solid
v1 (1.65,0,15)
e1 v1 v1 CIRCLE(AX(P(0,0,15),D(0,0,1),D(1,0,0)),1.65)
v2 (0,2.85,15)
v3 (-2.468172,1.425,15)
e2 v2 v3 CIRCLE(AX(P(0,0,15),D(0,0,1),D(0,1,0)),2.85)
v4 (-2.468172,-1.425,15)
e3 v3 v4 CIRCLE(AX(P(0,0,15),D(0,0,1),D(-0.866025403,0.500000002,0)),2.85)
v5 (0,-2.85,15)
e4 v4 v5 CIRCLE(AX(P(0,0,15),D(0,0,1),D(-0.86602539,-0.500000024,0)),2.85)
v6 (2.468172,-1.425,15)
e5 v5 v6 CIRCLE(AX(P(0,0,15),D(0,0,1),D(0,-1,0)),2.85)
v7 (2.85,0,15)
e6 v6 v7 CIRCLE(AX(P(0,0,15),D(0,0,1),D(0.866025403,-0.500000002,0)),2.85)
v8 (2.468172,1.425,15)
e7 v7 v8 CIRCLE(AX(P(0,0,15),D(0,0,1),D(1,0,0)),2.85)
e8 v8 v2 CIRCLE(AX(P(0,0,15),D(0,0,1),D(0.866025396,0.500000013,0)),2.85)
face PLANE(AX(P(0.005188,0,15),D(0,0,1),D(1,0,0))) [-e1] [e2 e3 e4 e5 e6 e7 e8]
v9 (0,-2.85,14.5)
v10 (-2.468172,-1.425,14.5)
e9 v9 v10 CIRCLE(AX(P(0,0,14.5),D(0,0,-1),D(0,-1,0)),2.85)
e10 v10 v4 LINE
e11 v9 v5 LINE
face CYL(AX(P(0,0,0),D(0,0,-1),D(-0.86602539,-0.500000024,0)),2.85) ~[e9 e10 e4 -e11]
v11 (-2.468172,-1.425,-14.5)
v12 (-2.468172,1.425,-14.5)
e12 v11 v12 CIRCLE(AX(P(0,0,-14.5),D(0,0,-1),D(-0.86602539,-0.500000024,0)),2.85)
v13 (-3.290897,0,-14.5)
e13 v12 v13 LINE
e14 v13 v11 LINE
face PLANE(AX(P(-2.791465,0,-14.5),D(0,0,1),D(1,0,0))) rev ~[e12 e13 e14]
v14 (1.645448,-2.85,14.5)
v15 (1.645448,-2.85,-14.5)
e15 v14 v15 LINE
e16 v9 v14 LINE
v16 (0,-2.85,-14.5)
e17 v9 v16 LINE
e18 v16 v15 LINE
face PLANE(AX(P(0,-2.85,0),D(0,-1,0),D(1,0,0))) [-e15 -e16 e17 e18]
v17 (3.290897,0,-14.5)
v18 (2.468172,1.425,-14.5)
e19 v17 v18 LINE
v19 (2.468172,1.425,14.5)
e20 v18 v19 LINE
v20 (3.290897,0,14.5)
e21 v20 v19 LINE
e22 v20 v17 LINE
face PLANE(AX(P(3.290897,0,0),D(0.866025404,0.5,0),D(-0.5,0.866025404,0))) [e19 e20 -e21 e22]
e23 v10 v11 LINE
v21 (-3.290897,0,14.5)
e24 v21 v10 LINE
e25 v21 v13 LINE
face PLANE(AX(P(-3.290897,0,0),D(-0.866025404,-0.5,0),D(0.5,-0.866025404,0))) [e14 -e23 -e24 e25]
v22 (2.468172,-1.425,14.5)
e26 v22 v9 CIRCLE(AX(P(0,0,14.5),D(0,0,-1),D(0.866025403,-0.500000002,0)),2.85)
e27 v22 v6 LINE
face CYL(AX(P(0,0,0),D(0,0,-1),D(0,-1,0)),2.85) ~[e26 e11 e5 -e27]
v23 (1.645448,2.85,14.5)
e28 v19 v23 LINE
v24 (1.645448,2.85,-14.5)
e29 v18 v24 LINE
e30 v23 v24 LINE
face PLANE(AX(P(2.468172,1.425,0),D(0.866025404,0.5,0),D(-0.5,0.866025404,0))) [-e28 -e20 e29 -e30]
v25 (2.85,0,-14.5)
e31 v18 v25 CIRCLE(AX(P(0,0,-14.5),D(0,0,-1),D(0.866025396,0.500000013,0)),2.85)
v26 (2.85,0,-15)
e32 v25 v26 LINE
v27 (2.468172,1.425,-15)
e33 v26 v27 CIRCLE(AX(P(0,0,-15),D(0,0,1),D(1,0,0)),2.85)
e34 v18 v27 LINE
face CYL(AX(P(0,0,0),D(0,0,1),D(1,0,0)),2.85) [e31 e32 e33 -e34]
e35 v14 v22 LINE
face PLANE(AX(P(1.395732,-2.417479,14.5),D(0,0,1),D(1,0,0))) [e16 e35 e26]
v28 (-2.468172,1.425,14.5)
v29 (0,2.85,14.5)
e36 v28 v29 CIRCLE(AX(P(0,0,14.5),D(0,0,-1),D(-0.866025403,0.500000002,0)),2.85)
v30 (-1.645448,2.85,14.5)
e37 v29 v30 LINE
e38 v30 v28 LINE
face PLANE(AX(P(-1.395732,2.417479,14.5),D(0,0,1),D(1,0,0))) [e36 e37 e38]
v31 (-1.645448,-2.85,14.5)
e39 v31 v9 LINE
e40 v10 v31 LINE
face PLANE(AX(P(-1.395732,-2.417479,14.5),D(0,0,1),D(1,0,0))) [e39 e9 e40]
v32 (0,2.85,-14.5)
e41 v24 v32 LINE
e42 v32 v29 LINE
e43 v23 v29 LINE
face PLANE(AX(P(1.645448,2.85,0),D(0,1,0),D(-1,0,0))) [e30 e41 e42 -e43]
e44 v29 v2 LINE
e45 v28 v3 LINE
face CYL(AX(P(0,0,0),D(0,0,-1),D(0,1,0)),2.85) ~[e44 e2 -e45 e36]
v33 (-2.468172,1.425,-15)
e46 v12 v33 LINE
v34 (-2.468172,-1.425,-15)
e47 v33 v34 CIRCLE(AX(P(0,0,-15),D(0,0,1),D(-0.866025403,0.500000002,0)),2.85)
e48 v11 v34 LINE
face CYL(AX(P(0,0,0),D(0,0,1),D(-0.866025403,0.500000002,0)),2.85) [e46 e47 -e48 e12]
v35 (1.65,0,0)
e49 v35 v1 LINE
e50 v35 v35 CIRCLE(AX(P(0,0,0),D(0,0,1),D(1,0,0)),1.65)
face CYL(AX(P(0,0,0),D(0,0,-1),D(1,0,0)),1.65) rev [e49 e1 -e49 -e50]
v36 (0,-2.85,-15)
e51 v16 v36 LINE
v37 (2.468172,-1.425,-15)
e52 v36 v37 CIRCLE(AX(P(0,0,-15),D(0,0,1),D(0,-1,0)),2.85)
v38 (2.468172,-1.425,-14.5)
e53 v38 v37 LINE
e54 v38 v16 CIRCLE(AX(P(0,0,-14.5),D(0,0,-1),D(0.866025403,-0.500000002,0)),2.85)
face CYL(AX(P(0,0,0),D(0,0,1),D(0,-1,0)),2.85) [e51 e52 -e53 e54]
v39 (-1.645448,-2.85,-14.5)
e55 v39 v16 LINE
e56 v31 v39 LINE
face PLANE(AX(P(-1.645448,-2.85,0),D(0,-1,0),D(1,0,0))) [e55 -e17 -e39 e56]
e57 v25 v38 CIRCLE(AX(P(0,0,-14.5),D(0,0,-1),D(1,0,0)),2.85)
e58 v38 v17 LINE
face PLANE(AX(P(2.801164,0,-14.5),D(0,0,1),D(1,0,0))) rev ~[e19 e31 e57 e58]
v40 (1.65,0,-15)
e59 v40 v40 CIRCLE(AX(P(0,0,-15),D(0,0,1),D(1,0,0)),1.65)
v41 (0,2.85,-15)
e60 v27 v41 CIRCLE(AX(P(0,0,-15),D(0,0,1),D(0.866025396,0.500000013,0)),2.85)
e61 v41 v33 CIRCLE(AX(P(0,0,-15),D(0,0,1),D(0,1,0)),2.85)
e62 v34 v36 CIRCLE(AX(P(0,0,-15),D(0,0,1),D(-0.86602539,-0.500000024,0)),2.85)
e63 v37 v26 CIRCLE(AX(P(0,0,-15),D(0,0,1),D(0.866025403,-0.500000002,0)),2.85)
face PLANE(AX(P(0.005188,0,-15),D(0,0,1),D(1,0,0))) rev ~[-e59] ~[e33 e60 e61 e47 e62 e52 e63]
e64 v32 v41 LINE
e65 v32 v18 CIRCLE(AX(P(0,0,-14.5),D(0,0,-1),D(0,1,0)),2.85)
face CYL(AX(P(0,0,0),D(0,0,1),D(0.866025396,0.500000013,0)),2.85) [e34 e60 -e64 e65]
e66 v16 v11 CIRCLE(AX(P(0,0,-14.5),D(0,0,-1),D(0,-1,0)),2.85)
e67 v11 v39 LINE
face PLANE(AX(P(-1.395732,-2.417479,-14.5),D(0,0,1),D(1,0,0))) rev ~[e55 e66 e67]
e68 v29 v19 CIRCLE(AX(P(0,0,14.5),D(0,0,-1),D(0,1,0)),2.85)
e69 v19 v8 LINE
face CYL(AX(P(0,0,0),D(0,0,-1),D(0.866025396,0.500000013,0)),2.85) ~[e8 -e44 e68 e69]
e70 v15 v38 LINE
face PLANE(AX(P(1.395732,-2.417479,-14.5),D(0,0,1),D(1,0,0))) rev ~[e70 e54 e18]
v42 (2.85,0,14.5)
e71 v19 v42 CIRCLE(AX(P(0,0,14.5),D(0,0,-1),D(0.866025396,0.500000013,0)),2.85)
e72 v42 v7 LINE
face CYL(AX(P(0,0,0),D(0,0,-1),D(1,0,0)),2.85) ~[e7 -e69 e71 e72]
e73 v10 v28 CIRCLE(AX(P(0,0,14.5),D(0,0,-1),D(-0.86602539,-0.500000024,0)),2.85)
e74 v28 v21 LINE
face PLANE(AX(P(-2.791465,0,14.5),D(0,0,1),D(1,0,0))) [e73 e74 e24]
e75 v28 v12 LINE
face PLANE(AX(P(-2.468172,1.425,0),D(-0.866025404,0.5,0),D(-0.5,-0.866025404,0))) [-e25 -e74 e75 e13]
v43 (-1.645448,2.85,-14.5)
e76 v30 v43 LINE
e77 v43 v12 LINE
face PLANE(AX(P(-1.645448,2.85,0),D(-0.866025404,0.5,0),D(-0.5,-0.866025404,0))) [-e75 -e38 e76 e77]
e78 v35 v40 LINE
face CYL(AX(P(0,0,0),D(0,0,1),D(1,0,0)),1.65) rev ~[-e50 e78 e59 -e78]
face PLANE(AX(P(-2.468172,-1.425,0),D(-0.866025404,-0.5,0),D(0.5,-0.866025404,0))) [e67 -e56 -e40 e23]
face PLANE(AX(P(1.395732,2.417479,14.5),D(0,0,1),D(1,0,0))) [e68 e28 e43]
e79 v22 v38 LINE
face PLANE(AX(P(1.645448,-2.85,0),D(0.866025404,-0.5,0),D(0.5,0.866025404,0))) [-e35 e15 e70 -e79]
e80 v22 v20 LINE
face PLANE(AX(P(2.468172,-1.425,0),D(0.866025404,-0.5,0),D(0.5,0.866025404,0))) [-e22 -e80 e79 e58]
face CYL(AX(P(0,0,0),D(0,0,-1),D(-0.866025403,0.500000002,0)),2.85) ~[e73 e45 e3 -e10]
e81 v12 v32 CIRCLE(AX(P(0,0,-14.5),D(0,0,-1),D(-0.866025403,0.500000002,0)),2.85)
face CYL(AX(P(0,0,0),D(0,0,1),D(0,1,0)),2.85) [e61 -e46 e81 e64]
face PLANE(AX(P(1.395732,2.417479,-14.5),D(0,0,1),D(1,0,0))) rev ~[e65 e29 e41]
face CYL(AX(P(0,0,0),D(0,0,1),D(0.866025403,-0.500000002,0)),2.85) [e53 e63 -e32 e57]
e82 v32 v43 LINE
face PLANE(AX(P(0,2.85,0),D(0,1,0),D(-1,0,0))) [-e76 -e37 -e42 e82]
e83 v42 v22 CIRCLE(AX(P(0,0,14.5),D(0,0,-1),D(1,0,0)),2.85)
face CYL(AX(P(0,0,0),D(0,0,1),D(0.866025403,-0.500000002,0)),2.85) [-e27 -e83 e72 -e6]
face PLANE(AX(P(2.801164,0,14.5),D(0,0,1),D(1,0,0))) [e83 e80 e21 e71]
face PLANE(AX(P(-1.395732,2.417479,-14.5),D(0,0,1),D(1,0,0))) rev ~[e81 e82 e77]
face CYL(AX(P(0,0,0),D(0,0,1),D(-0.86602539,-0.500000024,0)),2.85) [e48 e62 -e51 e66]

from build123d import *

# Parameters (mm, degrees)
F2_DEPTH = 14.5
F0_R     = 1.65
F3_DEPTH = 15


# Not quite as in the source:
# - the program builds the solid bodies; features that only make, move or delete a surface that nothing else refers to are left out


with BuildPart() as f2:
    # F0 (on Top) → F2 (new body, symmetric)
    with BuildSketch(Plane.XY):
        with BuildLine():
            ThreePointArc((-2.4681723606, -1.4250000696), (-2.85, -3.73e-08), (-2.4681723979, 1.425000005))
            Line((-2.4681723979, 1.425000005), (-3.2908965344, 0))
            Line((-3.2908965344, 0), (-2.4681723606, -1.4250000696))
        make_face()
    extrude(amount=F2_DEPTH, both=True)



with BuildPart() as f2b:
    # F0 (on Top) → F2, piece 2 (new body, symmetric)
    with BuildSketch(Plane.XY):
        with BuildLine():
            ThreePointArc((-2.4681723979, 1.425000005), (-1.4249999975, 2.4681724022), (0, 2.85))
            Line((0, 2.85), (-1.6454482672, 2.85))
            Line((-1.6454482672, 2.85), (-2.4681723979, 1.425000005))
        make_face()
    extrude(amount=F2_DEPTH, both=True)


with BuildPart() as f2c:
    # F0 (on Top) → F2, piece 3 (new body, symmetric)
    with BuildSketch(Plane.XY):
        with BuildLine():
            ThreePointArc((0, 2.85), (1.4249999814, 2.4681724115), (2.4681723793, 1.4250000373))
            Line((2.4681723793, 1.4250000373), (1.6454482672, 2.85))
            Line((1.6454482672, 2.85), (0, 2.85))
        make_face()
    extrude(amount=F2_DEPTH, both=True)


with BuildPart() as f2d:
    # F0 (on Top) → F2, piece 4 (new body, symmetric)
    with BuildSketch(Plane.XY):
        with BuildLine():
            ThreePointArc((2.4681723793, 1.4250000373), (2.7528885994, 0.7376342993), (2.85, 0))
            ThreePointArc((2.85, 0), (2.7528886042, -0.7376342813), (2.4681723979, -1.425000005))
            Line((2.4681723979, -1.425000005), (3.2908965344, 0))
            Line((3.2908965344, 0), (2.4681723793, 1.4250000373))
        make_face()
    extrude(amount=F2_DEPTH, both=True)


with BuildPart() as f2e:
    # F0 (on Top) → F2, piece 5 (new body, symmetric)
    with BuildSketch(Plane.XY):
        with BuildLine():
            Line((1.6454482672, -2.85), (2.4681723979, -1.425000005))
            ThreePointArc((2.4681723979, -1.425000005), (1.4249999975, -2.4681724022), (0, -2.85))
            Line((0, -2.85), (1.6454482672, -2.85))
        make_face()
    extrude(amount=F2_DEPTH, both=True)


with BuildPart() as f2f:
    # F0 (on Top) → F2, piece 6 (new body, symmetric)
    with BuildSketch(Plane.XY):
        with BuildLine():
            Line((-1.6454482672, -2.85), (0, -2.85))
            ThreePointArc((0, -2.85), (-1.4249999652, -2.4681724209), (-2.4681723606, -1.4250000696))
            Line((-2.4681723606, -1.4250000696), (-1.6454482672, -2.85))
        make_face()
    extrude(amount=F2_DEPTH, both=True)


with BuildPart() as f2_1:
    add(f2.part)

    add(f2b.part)  # F3 merges F2b

    add(f2c.part)  # F3 merges F2c

    add(f2d.part)  # F3 merges F2d

    add(f2e.part)  # F3 merges F2e

    add(f2f.part)  # F3 merges F2f
    # F0 (on Top) → F3 (join, symmetric)
    with BuildSketch(Plane.XY):
        with BuildLine():
            ThreePointArc((2.4681723979, -1.425000005), (2.7528886042, -0.7376342813), (2.85, 0))
            ThreePointArc((2.85, 0), (2.7528885994, 0.7376342993), (2.4681723793, 1.4250000373))
            ThreePointArc((2.4681723793, 1.4250000373), (1.4249999814, 2.4681724115), (0, 2.85))
            ThreePointArc((0, 2.85), (-1.4249999975, 2.4681724022), (-2.4681723979, 1.425000005))
            ThreePointArc((-2.4681723979, 1.425000005), (-2.85, -3.73e-08), (-2.4681723606, -1.4250000696))
            ThreePointArc((-2.4681723606, -1.4250000696), (-1.4249999652, -2.4681724209), (0, -2.85))
            ThreePointArc((0, -2.85), (1.4249999975, -2.4681724022), (2.4681723979, -1.425000005))
        make_face()
        Circle(F0_R, mode=Mode.SUBTRACT)
    extrude(amount=F3_DEPTH, both=True)


solid = f2_1.part
